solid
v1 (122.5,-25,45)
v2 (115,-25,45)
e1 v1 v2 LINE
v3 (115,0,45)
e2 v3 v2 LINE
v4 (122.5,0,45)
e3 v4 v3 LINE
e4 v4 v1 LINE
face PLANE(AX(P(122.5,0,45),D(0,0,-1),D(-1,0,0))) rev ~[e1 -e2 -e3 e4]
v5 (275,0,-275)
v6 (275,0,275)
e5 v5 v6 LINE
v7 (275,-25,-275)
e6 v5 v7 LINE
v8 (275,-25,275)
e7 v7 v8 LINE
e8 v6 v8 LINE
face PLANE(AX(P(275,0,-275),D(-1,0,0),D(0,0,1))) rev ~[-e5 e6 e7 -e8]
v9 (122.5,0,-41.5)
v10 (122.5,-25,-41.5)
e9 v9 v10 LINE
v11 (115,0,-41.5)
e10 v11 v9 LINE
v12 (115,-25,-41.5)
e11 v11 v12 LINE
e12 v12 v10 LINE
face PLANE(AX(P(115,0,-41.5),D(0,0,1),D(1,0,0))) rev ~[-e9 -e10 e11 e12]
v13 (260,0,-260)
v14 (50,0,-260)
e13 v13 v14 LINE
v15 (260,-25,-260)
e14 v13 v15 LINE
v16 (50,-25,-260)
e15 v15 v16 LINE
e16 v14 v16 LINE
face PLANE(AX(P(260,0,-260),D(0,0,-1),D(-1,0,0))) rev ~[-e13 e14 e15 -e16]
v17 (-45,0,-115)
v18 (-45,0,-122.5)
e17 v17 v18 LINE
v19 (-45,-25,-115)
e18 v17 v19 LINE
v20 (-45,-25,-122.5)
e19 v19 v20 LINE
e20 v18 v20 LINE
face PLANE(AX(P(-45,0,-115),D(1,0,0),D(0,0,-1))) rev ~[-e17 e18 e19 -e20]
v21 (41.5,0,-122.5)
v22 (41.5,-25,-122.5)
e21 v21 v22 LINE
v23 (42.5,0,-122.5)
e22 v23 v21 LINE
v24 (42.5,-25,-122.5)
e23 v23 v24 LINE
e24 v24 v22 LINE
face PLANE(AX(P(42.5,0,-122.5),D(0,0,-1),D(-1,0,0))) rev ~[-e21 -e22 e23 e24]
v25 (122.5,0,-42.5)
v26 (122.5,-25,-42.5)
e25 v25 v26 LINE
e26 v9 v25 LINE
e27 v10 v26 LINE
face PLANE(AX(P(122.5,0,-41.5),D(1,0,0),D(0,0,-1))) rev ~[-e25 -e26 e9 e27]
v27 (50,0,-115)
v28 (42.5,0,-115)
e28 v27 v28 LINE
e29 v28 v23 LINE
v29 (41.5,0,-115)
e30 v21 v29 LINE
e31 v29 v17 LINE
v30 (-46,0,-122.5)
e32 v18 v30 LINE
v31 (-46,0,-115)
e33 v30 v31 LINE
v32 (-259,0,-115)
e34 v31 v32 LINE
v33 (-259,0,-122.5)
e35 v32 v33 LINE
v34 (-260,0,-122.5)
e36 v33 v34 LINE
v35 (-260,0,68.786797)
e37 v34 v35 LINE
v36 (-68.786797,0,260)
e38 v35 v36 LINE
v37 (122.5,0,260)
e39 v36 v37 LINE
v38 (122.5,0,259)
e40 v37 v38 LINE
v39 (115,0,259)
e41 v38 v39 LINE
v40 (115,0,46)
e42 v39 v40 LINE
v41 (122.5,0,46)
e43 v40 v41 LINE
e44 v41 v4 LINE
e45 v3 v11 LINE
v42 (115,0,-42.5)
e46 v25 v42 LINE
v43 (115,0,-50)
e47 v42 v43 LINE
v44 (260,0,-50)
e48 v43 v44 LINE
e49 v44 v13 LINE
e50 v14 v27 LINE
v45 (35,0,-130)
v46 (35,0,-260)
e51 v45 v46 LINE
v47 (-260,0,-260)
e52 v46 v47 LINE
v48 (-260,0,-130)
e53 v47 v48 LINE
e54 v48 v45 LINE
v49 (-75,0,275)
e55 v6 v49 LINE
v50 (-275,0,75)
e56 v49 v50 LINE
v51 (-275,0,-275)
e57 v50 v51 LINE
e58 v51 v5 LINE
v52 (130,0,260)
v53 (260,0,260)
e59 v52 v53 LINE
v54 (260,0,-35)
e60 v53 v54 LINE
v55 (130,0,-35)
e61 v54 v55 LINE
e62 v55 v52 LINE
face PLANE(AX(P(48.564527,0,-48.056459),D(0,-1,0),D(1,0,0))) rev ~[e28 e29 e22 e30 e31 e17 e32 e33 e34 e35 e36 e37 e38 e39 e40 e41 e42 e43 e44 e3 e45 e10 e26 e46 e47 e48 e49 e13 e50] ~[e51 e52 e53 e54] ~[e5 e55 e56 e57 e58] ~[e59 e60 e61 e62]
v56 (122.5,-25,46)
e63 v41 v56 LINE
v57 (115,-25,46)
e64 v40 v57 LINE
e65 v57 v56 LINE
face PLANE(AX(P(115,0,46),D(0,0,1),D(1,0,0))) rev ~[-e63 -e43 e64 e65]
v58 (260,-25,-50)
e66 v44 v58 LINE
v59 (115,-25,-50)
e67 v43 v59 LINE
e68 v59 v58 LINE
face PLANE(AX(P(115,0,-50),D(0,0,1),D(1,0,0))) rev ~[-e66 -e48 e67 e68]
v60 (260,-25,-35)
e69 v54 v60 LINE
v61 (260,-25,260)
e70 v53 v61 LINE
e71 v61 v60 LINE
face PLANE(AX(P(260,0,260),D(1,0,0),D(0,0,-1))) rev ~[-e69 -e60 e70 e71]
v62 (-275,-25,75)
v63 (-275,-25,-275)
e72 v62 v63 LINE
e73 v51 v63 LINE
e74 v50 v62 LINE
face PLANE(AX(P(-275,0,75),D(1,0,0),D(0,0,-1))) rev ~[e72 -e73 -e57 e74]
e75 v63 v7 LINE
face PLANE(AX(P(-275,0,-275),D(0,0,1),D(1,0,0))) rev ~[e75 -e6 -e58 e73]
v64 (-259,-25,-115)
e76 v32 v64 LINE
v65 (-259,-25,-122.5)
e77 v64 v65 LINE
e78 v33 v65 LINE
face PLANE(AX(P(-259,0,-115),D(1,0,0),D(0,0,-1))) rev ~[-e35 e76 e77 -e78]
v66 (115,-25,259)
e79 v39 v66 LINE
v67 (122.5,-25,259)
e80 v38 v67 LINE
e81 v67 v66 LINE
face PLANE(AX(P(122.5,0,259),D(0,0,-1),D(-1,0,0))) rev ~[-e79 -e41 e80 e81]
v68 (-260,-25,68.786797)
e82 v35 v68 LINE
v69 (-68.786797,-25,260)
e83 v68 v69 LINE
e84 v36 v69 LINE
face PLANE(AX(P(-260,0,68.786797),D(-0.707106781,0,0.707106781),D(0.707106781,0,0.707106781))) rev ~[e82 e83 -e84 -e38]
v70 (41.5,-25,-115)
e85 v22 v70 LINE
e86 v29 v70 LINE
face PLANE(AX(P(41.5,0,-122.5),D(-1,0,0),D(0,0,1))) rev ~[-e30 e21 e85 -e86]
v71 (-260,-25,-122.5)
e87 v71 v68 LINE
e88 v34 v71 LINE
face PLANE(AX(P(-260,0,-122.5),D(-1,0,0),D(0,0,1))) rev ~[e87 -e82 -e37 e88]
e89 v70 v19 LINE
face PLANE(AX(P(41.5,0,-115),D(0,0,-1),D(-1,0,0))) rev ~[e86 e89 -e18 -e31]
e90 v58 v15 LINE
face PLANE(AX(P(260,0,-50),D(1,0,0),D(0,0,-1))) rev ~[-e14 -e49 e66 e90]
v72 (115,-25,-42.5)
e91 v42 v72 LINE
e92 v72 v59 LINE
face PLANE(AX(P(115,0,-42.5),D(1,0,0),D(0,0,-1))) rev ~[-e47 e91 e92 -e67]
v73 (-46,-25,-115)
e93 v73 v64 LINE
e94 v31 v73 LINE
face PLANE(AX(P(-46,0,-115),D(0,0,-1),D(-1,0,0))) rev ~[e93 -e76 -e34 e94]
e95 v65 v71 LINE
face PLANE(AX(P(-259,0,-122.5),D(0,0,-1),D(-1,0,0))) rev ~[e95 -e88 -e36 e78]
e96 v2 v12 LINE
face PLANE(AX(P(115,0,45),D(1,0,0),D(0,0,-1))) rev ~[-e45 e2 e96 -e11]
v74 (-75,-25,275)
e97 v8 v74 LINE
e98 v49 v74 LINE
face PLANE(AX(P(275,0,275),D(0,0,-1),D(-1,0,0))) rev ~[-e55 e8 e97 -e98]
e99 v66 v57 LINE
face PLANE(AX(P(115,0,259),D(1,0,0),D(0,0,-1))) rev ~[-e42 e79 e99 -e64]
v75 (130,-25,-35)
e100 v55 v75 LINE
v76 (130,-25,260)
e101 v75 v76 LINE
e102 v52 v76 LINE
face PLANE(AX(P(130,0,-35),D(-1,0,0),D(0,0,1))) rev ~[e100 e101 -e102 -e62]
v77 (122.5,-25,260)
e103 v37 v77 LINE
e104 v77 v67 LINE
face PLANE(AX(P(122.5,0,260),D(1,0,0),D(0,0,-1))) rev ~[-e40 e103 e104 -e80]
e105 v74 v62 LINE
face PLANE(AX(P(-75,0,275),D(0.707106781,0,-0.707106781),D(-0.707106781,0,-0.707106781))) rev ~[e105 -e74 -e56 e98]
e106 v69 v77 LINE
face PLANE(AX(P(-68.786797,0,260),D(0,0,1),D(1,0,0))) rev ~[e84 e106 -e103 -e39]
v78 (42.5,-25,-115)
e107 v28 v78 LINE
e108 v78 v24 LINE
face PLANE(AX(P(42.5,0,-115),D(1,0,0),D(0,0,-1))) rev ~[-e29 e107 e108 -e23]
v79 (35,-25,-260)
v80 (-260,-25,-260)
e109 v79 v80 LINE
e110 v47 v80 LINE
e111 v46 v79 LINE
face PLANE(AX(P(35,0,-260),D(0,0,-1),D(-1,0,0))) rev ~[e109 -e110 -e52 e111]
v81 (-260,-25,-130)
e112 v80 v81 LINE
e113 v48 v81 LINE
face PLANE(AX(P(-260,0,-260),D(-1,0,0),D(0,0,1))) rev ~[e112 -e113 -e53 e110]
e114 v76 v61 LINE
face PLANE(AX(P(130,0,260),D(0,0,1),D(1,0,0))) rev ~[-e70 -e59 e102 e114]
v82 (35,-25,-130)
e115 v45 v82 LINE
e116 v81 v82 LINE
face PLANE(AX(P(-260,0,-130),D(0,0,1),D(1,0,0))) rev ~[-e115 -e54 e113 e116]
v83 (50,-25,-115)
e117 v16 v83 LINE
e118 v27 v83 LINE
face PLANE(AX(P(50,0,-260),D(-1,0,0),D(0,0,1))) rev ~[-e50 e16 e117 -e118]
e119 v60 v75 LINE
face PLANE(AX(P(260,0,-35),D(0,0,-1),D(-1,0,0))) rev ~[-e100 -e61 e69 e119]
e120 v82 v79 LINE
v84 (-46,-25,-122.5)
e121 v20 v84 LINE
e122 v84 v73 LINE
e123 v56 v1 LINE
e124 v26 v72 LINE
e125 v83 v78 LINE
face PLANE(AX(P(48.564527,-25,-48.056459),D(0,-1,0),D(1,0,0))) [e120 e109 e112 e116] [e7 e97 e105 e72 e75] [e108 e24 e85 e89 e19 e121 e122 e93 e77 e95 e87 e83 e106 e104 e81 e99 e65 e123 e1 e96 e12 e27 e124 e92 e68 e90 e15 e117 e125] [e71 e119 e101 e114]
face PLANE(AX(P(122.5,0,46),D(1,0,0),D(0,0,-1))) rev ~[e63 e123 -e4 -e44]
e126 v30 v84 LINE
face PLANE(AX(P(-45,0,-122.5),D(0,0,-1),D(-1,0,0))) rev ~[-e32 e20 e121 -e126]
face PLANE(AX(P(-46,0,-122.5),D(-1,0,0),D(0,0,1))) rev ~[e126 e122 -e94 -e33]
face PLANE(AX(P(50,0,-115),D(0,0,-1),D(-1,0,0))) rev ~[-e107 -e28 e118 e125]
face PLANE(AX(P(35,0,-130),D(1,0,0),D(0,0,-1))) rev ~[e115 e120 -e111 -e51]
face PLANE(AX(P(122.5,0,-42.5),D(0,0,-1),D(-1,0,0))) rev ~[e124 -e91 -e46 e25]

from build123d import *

# Parameters (mm, degrees)
F1_DEPTH = 25


# Not quite as in the source:
# - ends of sketch curves that miss each other by under 0.0002 mm in the source are joined


with BuildPart() as f1:
    # F0 (on Front) → F1 (new body)
    with BuildSketch(Plane.XZ):
        Polygon((-275, 53.7867965644), (-275, -275), (275, -275), (275, 275), (-68.7867965644, 275), (-68.7867965644, 260), (115, 260), (115, 267.5000010639), (130, 267.5000010639), (130, 260), (260, 260), (260, -35), (267.5, -35), (267.5, -50), (260, -50), (260, -260), (50, -260), (50, -267.5), (35, -267.5), (35, -260), (-260, -260), (-260, -130), (-267.5, -130), (-267.5, -115), (-260, -115), (-260, 68.7867965644), (-268.7268512791, 60.0599452853), align=None)
        Polygon((-275, 68.7867965644), (-275, 53.7867965644), (-268.7268512791, 60.0599452853), (-260, 68.7867965644), align=None)
        Polygon((-275, 75), (-275, 68.7867965644), (-260, 68.7867965644), align=None)
        Polygon((-68.7867965644, 260), (-68.7867965644, 275), (-75, 275), align=None)
        Polygon((-79.3933982822, 270.6066017178), (-275, 75), (-260, 68.7867965644), (-68.7867965644, 260), align=None)
        Polygon((-68.7867965644, 260), (-75, 275), (-79.3933982822, 270.6066017178), align=None)
        Polygon((-260, -122.5), (-260, -115), (-267.5, -115), (-267.5, -130), (-260, -130), (35, -130), (35, -260), (35, -267.5), (50, -267.5), (50, -260), (50, -115), (42.5, -115), (42.5, -122.5), (41.5, -122.5), (41.5, -115), (39.3933982822, -115), (-44.3324317381, -115), (-45, -115), (-45, -122.5), (-46, -122.5), (-46, -115), (-258.5857843554, -115), (-259, -115), (-259, -115.414213564), (-259, -122.5), align=None)
        Polygon((115, 267.5000010639), (115, 260), (122.5, 260), (122.5, 259), (115.414213564, 259), (115, 259), (115, 258.5857864337), (115, 46), (122.5, 46), (122.5, 45), (115, 45), (115, -41.5), (122.5, -41.5), (122.5, -42.5), (115, -42.5), (115, -50), (260, -50), (267.5, -50), (267.5, -35), (260, -35), (130, -35), (130, 260), (130, 267.5000010639), align=None)
    extrude(amount=F1_DEPTH)


solid = f1.part
